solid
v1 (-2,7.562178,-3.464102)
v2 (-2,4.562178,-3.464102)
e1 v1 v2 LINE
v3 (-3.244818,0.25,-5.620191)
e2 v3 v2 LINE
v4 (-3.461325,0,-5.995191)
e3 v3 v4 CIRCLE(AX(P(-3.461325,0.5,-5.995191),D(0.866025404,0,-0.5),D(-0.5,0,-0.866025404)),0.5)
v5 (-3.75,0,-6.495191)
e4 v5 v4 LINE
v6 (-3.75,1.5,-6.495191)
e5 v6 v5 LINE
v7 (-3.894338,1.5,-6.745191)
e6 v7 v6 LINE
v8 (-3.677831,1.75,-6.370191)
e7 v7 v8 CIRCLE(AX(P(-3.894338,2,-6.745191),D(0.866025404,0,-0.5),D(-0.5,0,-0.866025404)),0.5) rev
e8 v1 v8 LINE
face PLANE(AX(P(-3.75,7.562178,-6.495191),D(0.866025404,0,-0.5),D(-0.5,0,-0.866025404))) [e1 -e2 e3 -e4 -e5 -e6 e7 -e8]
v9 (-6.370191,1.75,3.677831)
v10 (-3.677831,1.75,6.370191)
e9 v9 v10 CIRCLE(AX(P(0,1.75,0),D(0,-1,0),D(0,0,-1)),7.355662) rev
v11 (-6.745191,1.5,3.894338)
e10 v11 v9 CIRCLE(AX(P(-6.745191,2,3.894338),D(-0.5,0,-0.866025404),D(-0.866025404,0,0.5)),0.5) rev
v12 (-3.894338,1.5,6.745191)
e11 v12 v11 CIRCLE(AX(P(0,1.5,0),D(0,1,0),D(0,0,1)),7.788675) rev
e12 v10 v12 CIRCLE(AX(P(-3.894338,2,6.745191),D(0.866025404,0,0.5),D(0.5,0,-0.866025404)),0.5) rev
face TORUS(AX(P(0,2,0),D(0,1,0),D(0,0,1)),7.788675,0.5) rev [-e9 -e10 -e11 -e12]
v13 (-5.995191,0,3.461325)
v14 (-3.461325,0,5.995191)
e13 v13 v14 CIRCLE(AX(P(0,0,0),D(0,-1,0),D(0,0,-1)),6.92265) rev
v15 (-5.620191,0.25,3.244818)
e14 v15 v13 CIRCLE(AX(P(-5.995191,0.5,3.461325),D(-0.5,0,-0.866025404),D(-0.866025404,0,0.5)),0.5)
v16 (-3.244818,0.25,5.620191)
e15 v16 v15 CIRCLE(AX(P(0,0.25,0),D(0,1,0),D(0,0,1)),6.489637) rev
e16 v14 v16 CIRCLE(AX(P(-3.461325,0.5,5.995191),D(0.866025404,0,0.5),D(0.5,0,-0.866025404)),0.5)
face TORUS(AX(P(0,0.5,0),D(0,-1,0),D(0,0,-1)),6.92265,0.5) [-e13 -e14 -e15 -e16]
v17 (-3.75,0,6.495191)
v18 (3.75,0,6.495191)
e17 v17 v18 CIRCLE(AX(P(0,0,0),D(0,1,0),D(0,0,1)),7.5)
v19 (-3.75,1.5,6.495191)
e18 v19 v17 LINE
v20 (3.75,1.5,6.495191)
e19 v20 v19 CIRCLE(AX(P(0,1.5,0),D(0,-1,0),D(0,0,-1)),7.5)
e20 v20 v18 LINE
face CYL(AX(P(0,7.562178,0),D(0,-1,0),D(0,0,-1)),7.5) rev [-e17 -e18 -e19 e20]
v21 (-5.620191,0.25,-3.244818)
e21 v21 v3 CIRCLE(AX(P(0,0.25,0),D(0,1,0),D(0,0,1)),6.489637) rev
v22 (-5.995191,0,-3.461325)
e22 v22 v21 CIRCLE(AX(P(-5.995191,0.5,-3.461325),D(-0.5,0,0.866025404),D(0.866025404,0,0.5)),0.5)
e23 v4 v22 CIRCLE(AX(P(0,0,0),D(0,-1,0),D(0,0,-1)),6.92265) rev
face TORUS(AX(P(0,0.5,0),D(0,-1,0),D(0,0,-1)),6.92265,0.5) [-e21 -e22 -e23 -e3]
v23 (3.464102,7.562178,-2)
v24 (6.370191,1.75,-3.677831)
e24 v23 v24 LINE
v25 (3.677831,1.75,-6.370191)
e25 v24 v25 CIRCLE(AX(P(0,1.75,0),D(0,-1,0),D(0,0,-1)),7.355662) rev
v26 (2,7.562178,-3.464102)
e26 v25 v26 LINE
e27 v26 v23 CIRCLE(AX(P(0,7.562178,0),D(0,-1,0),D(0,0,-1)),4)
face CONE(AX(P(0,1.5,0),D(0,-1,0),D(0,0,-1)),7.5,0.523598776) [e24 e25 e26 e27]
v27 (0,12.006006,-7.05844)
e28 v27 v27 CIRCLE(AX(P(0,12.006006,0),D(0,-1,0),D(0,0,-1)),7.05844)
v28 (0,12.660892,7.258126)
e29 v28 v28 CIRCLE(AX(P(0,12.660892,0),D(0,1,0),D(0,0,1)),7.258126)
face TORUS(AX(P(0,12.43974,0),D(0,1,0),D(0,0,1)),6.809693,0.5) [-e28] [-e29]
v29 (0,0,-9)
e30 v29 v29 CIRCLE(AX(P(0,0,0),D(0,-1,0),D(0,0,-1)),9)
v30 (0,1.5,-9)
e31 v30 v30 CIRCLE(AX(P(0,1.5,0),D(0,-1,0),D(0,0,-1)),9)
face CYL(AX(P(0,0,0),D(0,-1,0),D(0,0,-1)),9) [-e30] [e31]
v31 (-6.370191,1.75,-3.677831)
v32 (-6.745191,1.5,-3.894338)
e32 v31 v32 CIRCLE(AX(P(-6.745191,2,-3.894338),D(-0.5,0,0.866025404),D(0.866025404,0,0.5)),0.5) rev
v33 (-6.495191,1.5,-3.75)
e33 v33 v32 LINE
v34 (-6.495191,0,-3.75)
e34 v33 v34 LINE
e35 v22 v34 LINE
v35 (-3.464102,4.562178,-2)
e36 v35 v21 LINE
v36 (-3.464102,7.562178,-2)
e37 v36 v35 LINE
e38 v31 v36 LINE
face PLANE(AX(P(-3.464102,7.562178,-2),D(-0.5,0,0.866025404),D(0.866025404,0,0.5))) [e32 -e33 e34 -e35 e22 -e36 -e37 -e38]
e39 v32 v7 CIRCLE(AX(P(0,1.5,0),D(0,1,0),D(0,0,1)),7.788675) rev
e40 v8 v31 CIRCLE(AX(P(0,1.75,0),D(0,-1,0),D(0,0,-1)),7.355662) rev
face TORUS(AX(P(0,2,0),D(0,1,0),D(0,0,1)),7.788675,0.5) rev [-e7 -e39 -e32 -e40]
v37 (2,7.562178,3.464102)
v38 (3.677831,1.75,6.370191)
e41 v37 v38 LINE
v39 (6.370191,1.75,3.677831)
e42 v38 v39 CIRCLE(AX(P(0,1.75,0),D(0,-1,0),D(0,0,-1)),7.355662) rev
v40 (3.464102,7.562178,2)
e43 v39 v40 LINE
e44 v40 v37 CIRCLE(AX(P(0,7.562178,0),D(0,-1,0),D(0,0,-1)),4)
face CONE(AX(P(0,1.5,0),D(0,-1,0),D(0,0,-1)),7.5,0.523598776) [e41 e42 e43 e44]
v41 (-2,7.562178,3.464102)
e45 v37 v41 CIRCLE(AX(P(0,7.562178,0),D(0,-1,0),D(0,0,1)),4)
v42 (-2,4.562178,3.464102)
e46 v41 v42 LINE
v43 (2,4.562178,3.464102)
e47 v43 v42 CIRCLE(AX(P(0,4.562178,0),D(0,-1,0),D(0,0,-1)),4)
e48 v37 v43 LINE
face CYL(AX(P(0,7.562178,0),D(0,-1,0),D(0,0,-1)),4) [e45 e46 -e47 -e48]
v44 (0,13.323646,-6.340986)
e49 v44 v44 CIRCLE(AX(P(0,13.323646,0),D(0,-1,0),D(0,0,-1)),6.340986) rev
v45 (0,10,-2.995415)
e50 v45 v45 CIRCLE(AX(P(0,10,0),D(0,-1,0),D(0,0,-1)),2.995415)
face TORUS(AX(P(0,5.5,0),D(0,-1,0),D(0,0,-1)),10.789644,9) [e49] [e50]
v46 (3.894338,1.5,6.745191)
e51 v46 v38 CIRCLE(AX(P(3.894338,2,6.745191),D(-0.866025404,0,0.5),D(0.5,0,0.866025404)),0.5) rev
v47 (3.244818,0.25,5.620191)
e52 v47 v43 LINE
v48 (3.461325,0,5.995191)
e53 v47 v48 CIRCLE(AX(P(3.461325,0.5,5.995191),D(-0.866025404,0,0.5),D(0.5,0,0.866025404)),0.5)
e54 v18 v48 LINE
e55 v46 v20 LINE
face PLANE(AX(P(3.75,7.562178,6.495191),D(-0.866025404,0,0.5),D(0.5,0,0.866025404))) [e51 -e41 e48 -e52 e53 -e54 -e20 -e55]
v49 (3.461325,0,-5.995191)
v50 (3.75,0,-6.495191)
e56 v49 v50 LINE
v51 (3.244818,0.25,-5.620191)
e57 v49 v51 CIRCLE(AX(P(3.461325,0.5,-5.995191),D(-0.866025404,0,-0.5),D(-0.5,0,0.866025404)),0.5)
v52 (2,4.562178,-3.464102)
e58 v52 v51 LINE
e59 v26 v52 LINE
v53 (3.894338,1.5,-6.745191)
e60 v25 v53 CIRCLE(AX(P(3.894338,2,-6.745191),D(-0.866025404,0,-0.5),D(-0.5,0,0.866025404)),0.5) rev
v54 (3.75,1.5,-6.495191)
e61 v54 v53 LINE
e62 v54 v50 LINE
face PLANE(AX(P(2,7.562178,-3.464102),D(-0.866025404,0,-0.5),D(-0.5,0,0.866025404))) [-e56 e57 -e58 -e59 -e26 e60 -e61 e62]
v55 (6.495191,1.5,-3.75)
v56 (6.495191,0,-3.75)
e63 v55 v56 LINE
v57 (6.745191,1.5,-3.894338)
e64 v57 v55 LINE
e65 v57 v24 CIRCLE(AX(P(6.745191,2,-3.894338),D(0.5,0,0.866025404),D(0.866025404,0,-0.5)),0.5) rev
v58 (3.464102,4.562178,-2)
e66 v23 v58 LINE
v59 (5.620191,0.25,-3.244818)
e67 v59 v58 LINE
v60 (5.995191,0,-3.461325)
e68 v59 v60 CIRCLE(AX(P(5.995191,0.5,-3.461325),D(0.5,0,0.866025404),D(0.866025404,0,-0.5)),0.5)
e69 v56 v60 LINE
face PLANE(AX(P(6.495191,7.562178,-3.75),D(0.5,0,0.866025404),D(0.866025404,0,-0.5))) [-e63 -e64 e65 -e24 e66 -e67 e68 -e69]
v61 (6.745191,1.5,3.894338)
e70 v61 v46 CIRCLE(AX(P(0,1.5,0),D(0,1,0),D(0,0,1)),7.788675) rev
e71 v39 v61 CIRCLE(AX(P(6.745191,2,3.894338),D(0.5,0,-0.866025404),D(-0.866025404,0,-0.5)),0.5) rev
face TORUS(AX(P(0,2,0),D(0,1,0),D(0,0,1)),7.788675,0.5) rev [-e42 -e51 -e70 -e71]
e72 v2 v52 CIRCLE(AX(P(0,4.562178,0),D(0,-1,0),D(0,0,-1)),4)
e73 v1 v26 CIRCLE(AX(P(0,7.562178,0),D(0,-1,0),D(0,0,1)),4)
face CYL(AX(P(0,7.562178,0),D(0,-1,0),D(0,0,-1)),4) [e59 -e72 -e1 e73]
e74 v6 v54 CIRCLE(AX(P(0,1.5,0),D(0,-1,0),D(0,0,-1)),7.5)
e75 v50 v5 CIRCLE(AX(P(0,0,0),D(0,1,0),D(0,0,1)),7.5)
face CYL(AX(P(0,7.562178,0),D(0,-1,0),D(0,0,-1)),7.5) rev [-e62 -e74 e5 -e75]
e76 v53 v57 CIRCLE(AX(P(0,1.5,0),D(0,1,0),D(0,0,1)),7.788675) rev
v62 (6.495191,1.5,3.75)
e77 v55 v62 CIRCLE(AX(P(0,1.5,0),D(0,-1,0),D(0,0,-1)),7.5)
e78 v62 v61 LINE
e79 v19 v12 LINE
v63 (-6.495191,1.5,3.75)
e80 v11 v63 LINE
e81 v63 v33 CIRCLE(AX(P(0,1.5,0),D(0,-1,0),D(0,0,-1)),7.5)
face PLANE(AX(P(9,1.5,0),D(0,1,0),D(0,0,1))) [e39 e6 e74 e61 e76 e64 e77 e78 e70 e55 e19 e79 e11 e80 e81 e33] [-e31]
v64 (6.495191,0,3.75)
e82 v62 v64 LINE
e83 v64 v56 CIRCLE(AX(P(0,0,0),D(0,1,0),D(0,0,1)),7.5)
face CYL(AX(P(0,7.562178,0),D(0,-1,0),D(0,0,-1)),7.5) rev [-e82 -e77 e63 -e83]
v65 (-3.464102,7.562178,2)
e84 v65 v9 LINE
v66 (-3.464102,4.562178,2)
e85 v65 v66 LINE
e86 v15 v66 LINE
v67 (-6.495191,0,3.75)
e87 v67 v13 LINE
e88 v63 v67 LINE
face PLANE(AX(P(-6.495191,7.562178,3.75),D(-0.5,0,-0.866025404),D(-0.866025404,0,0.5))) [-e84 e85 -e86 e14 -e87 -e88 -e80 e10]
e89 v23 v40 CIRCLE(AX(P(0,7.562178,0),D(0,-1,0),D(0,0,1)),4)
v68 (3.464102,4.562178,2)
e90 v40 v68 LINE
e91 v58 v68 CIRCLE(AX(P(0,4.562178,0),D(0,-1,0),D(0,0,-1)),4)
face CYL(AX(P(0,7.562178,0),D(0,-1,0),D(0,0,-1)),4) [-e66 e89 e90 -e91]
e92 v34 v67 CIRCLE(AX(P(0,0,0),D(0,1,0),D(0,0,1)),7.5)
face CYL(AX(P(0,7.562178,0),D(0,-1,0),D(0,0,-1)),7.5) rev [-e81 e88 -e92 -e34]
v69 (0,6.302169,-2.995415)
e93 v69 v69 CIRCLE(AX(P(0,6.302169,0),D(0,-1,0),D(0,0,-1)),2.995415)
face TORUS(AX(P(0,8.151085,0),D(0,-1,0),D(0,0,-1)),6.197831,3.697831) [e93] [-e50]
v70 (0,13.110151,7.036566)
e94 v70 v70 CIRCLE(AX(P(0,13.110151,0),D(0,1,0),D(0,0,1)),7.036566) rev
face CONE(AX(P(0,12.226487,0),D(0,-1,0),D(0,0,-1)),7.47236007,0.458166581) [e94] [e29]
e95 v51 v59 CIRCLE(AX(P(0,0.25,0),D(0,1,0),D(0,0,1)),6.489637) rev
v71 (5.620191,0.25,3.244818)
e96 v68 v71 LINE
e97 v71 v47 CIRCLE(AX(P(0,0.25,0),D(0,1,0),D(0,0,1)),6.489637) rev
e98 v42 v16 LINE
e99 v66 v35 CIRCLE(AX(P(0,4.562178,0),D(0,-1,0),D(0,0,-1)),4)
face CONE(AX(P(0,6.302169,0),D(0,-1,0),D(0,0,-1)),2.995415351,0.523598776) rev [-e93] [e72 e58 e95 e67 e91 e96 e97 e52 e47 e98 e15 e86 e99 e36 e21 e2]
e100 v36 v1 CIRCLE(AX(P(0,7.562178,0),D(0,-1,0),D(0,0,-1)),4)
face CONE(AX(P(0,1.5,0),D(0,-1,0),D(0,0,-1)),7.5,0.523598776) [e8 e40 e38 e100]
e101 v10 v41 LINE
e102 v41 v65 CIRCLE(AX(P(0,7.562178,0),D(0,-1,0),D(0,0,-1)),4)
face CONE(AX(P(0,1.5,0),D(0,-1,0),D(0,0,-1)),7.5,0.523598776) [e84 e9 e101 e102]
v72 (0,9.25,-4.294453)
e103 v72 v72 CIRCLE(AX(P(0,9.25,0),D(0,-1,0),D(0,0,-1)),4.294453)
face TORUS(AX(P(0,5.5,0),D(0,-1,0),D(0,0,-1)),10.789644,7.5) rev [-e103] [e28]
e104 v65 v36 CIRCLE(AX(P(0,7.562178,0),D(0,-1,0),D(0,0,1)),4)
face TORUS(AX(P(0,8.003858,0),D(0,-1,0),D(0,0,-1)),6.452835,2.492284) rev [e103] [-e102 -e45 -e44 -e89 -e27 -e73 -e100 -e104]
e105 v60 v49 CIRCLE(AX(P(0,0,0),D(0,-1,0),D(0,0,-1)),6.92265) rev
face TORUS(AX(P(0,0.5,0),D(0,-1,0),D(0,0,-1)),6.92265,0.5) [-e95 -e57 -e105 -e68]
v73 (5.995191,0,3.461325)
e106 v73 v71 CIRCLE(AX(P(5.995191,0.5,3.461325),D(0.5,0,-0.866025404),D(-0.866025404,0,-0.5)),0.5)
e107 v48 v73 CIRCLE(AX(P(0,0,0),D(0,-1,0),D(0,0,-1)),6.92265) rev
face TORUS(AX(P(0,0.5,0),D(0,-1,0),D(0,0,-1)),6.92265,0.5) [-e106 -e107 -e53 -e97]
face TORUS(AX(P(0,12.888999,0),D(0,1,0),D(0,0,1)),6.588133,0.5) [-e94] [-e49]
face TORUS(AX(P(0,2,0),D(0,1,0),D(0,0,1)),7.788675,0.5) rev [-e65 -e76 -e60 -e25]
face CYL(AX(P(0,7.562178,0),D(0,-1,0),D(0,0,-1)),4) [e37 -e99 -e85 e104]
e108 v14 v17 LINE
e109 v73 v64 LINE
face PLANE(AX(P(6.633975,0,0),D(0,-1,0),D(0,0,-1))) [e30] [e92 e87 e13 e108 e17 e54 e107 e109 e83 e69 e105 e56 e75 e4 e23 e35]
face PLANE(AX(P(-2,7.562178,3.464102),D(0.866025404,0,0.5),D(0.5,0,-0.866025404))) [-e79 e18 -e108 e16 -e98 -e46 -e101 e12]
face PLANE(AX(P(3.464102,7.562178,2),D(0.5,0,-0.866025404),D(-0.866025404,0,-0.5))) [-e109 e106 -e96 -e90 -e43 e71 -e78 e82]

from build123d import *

# Parameters (mm, degrees)
CUT_EXTRUDE1_DEPTH = 7.562178
FILLET1_R          = 0.5


with BuildPart() as part:
    # Sketch1 → Revolve1 (revolve)
    with BuildSketch(Plane.XY, mode=Mode.PRIVATE) as revolve1_sk:
        with BuildLine():
            Line((6.633974596215569, -1.2e-16), (8.999999999999998, -4.52e-15))
            Line((8.999999999999998, -4.52e-15), (8.999999999999998, 1.4999999999999956))
            Line((8.999999999999998, 1.4999999999999956), (7.5, 1.5))
            Line((7.5, 1.5), (4, 7.562177826491056))
            ThreePointArc((4, 7.562177826491056), (3.99763327378791, 8.432186632808357), (4.294453456567456, 9.249999999999998))
            ThreePointArc((4.294453456567456, 9.249999999999998), (5.662653405718452, 10.973935293777526), (7.4723600696108665, 12.226487004746774))
            Line((7.4723600696108665, 12.226487004746774), (6.808903286542892, 13.57178440569613))
            ThreePointArc((6.808903286542892, 13.57178440569613), (4.6372552898719945, 12.068722352533033), (2.995415350890799, 10))
            ThreePointArc((2.995415350890799, 10), (2.4999999999999996, 8.15108473962598), (2.995415350890799, 6.302169479251957))
            Line((2.995415350890799, 6.302169479251957), (6.633974596215569, -1.2e-16))
        make_face()
    revolve(revolve1_sk.sketch.rotate(Axis((0, 0, 0), (0, 1, 0)), 90), axis=Axis((0, 0, 0), (0, 1, 0)))

    # Sketch2 → Cut-Extrude1 (cut)
    with BuildSketch(Plane(origin=(0, 0, 0), x_dir=(1, 0, 0), z_dir=(0, 1, 0))):
        with BuildLine():
            Line((-3.749999941549397, 6.495190562129763), (-1.999999941549405, 3.4641016488842244))
            ThreePointArc((-1.999999941549405, 3.4641016488842244), (2.4e-16, 4.0000000000000036), (1.999999941549405, 3.4641016488842244))
            Line((1.999999941549405, 3.4641016488842244), (3.749999941549397, 6.495190562129763))
            ThreePointArc((3.749999941549397, 6.495190562129763), (4.6e-16, 7.500000000000002), (-3.749999941549397, 6.495190562129763))
        make_face()
        with BuildLine():
            Line((6.495190562129763, 3.7499999415493974), (3.4641016488842244, 1.999999941549405))
            ThreePointArc((3.4641016488842244, 1.999999941549405), (4.0000000000000036, 0), (3.4641016488842244, -1.999999941549405))
            Line((3.4641016488842244, -1.999999941549405), (6.495190562129763, -3.7499999415493965))
            ThreePointArc((6.495190562129763, -3.7499999415493965), (7.500000000000002, 0), (6.495190562129763, 3.7499999415493974))
        make_face()
        with BuildLine():
            Line((3.749999941549398, -6.495190562129762), (1.9999999415494054, -3.464101648884224))
            ThreePointArc((1.9999999415494054, -3.464101648884224), (2.4e-16, -4.0000000000000036), (-1.9999999415494045, -3.464101648884225))
            Line((-1.9999999415494045, -3.464101648884225), (-3.749999941549396, -6.495190562129764))
            ThreePointArc((-3.749999941549396, -6.495190562129764), (2.12e-15, -7.500000000000003), (3.749999941549398, -6.495190562129762))
        make_face()
        with BuildLine():
            Line((-6.495190562129762, -3.7499999415493983), (-3.464101648884224, -1.9999999415494054))
            ThreePointArc((-3.464101648884224, -1.9999999415494054), (-4.0000000000000036, 4.9e-16), (-3.464101648884225, 1.9999999415494045))
            Line((-3.464101648884225, 1.9999999415494045), (-6.495190562129764, 3.7499999415493956))
            ThreePointArc((-6.495190562129764, 3.7499999415493956), (-7.500000000000002, -2.41e-15), (-6.495190562129762, -3.7499999415493983))
        make_face()
    extrude(amount=CUT_EXTRUDE1_DEPTH, mode=Mode.SUBTRACT)

    # Fillet1
    # the kernel refuses this fillet: 0.5 mm, written as the material it adds along each edge
    with BuildSketch(Plane(origin=(0, 1.5, 0), x_dir=(0.8660254082839624, 0, -0.49999999220659597), z_dir=(0.49999999220659597, 0, 0.8660254082839624))) as fillet1_piece_1:
        with BuildLine():
            CenterArc((7.499999999999999 + FILLET1_R * 0.57735026919, FILLET1_R), FILLET1_R, 209.99999999999957, 60.000000000000455)
            Line((7.499999999999999 - FILLET1_R * 0.288675134595, FILLET1_R * 0.5), (7.499999999999999, 0))
            Line((7.499999999999999, 0), (7.499999999999999 + FILLET1_R * 0.57735026919, -4.44e-15))
        make_face()
    revolve(axis=Axis((0, 1.5, 0), (0, 1, 0)), revolution_arc=30.000001031215383)
    with BuildSketch(Plane(origin=(0, 1.5, 0), x_dir=(0.4999999922066019, 0, 0.8660254082839591), z_dir=(-0.8660254082839591, 0, 0.4999999922066019))) as fillet1_piece_2:
        with BuildLine():
            CenterArc((7.5 + FILLET1_R * 0.57735026919, FILLET1_R), FILLET1_R, 209.99999999999957, 60.000000000000455)
            Line((7.5 - FILLET1_R * 0.288675134595, FILLET1_R * 0.5), (7.5, 0))
            Line((7.5, 0), (7.5 + FILLET1_R * 0.57735026919, -4.44e-15))
        make_face()
    revolve(axis=Axis((0, 1.5, 0), (0, 1, 0)), revolution_arc=30.000001031214644)
    with BuildSketch(Plane(origin=(0, 1.5, 0), x_dir=(-0.8660254082839636, 0, 0.49999999220659425), z_dir=(-0.49999999220659425, 0, -0.8660254082839636))) as fillet1_piece_3:
        with BuildLine():
            CenterArc((7.5 + FILLET1_R * 0.57735026919, FILLET1_R), FILLET1_R, 209.99999999999963, 60.00000000000034)
            Line((7.5 - FILLET1_R * 0.288675134595, FILLET1_R * 0.5), (7.5, 0))
            Line((7.5, 0), (7.5 + FILLET1_R * 0.57735026919, -4.44e-15))
        make_face()
    revolve(axis=Axis((0, 1.5, 0), (0, 1, 0)), revolution_arc=30.000001031214545)
    with BuildSketch(Plane(origin=(0, 1.5, 0), x_dir=(-0.49999999220658903, 0, -0.8660254082839666), z_dir=(0.8660254082839666, 0, -0.49999999220658903))) as fillet1_piece_4:
        with BuildLine():
            CenterArc((7.499999999999999 + FILLET1_R * 0.57735026919, FILLET1_R), FILLET1_R, 210.00000000000003, 59.99999999999987)
            Line((7.499999999999999 + FILLET1_R * 0.57735026919, 4.4e-16), (7.499999999999999, 0))
            Line((7.499999999999999, 0), (7.499999999999999 - FILLET1_R * 0.288675134595, FILLET1_R * 0.5))
        make_face()
    revolve(axis=Axis((0, 1.5, 0), (0, 1, 0)), revolution_arc=30.00000103121539)
    # the kernel refuses this fillet: 0.5 mm, written as the material it takes off along each edge
    with BuildSketch(Plane(origin=(0, -1.2e-16, 0), x_dir=(0.9151940117210042, 0, -0.40301354928837607), z_dir=(0.40301354928837607, 0, 0.9151940117210042))) as fillet1_2_piece_1:
        with BuildLine():
            CenterArc((6.633974596215569 + FILLET1_R * 0.57735026919, FILLET1_R), FILLET1_R, 210.00000000000003, 59.99999999999987)
            Line((6.633974596215569 + FILLET1_R * 0.57735026919, -1.27e-15), (6.633974596215569, 1.2e-16))
            Line((6.633974596215569, 1.2e-16), (6.633974596215569 - FILLET1_R * 0.288675134595, FILLET1_R * 0.5))
        make_face()
    revolve(axis=Axis((0, -1.2e-16, 0), (0, 1, 0)), revolution_arc=42.466588641203785, mode=Mode.SUBTRACT)
    with BuildSketch(Plane(origin=(0, -1.2e-16, 0), x_dir=(0.40301354928837646, 0, 0.915194011721004), z_dir=(-0.915194011721004, 0, 0.40301354928837646))) as fillet1_2_piece_2:
        with BuildLine():
            CenterArc((6.633974596215568 + FILLET1_R * 0.57735026919, FILLET1_R), FILLET1_R, 210.00000000000006, 59.999999999999844)
            Line((6.633974596215568 + FILLET1_R * 0.57735026919, -3.3e-16), (6.633974596215568, 1.2e-16))
            Line((6.633974596215568, 1.2e-16), (6.633974596215568 - FILLET1_R * 0.288675134595, FILLET1_R * 0.5))
        make_face()
    revolve(axis=Axis((0, -1.2e-16, 0), (0, 1, 0)), revolution_arc=42.466588641203685, mode=Mode.SUBTRACT)
    with BuildSketch(Plane(origin=(0, -1.2e-16, 0), x_dir=(-0.915194011721004, 0, 0.4030135492883765), z_dir=(-0.4030135492883765, 0, -0.915194011721004))) as fillet1_2_piece_3:
        with BuildLine():
            CenterArc((6.633974596215569 + FILLET1_R * 0.57735026919, FILLET1_R), FILLET1_R, 210.0000000000001, 59.999999999999886)
            Line((6.633974596215569 + FILLET1_R * 0.57735026919, -1.21e-15), (6.633974596215569, 1.2e-16))
            Line((6.633974596215569, 1.2e-16), (6.633974596215569 - FILLET1_R * 0.288675134595, FILLET1_R * 0.5))
        make_face()
    revolve(axis=Axis((0, -1.2e-16, 0), (0, 1, 0)), revolution_arc=42.466588641203685, mode=Mode.SUBTRACT)
    with BuildSketch(Plane(origin=(0, -1.2e-16, 0), x_dir=(-0.40301354928837607, 0, -0.9151940117210042), z_dir=(0.9151940117210042, 0, -0.40301354928837607))) as fillet1_2_piece_4:
        with BuildLine():
            CenterArc((6.63397459621557 + FILLET1_R * 0.57735026919, FILLET1_R), FILLET1_R, 210.00000000000006, 59.99999999999994)
            Line((6.63397459621557 + FILLET1_R * 0.57735026919, -1.21e-15), (6.63397459621557, 1.2e-16))
            Line((6.63397459621557, 1.2e-16), (6.63397459621557 - FILLET1_R * 0.288675134595, FILLET1_R * 0.5))
        make_face()
    revolve(axis=Axis((0, -1.2e-16, 0), (0, 1, 0)), revolution_arc=42.46658864120374, mode=Mode.SUBTRACT)
    with BuildSketch(Plane(origin=(0, 13.571784405696132, 0), x_dir=(1.1e-16, 0, -1), z_dir=(1, 0, 1.1e-16))) as fillet1_2_piece_5:
        with BuildLine():
            CenterArc((6.5881331953149616, -0.6827853473273997), FILLET1_R, 26.25101140415418, 93.3722866833914)
            Line((7.036565662297915, -0.46163308630440625), (6.808903286542892, 0))
            ThreePointArc((6.808903286542892, 0), (6.573118661901752, -0.12062636424792572), (6.3409855018069745, -0.2481383438939453))
        make_face()
    revolve(axis=Axis((0, 13.571784405696132, 0), (0, 1, 0)), mode=Mode.SUBTRACT)
    with BuildSketch(Plane(origin=(0, 12.226487004746774, 0), x_dir=(1.1e-16, 0, -1), z_dir=(1, 0, 1.1e-16))) as fillet1_2_piece_6:
        with BuildLine():
            CenterArc((6.809693112007429, 0.21325297950030375), FILLET1_R, 299.8343331025833, 86.41667830167688)
            Line((7.258125578989974, 0.43440524052412677), (7.4723600696108665, 0))
            ThreePointArc((7.4723600696108665, 0), (7.263676285711675, -0.10700426181869638), (7.058440041566387, -0.22048076951513984))
        make_face()
    revolve(axis=Axis((0, 12.226487004746774, 0), (0, 1, 0)), mode=Mode.SUBTRACT)


solid = part.part
